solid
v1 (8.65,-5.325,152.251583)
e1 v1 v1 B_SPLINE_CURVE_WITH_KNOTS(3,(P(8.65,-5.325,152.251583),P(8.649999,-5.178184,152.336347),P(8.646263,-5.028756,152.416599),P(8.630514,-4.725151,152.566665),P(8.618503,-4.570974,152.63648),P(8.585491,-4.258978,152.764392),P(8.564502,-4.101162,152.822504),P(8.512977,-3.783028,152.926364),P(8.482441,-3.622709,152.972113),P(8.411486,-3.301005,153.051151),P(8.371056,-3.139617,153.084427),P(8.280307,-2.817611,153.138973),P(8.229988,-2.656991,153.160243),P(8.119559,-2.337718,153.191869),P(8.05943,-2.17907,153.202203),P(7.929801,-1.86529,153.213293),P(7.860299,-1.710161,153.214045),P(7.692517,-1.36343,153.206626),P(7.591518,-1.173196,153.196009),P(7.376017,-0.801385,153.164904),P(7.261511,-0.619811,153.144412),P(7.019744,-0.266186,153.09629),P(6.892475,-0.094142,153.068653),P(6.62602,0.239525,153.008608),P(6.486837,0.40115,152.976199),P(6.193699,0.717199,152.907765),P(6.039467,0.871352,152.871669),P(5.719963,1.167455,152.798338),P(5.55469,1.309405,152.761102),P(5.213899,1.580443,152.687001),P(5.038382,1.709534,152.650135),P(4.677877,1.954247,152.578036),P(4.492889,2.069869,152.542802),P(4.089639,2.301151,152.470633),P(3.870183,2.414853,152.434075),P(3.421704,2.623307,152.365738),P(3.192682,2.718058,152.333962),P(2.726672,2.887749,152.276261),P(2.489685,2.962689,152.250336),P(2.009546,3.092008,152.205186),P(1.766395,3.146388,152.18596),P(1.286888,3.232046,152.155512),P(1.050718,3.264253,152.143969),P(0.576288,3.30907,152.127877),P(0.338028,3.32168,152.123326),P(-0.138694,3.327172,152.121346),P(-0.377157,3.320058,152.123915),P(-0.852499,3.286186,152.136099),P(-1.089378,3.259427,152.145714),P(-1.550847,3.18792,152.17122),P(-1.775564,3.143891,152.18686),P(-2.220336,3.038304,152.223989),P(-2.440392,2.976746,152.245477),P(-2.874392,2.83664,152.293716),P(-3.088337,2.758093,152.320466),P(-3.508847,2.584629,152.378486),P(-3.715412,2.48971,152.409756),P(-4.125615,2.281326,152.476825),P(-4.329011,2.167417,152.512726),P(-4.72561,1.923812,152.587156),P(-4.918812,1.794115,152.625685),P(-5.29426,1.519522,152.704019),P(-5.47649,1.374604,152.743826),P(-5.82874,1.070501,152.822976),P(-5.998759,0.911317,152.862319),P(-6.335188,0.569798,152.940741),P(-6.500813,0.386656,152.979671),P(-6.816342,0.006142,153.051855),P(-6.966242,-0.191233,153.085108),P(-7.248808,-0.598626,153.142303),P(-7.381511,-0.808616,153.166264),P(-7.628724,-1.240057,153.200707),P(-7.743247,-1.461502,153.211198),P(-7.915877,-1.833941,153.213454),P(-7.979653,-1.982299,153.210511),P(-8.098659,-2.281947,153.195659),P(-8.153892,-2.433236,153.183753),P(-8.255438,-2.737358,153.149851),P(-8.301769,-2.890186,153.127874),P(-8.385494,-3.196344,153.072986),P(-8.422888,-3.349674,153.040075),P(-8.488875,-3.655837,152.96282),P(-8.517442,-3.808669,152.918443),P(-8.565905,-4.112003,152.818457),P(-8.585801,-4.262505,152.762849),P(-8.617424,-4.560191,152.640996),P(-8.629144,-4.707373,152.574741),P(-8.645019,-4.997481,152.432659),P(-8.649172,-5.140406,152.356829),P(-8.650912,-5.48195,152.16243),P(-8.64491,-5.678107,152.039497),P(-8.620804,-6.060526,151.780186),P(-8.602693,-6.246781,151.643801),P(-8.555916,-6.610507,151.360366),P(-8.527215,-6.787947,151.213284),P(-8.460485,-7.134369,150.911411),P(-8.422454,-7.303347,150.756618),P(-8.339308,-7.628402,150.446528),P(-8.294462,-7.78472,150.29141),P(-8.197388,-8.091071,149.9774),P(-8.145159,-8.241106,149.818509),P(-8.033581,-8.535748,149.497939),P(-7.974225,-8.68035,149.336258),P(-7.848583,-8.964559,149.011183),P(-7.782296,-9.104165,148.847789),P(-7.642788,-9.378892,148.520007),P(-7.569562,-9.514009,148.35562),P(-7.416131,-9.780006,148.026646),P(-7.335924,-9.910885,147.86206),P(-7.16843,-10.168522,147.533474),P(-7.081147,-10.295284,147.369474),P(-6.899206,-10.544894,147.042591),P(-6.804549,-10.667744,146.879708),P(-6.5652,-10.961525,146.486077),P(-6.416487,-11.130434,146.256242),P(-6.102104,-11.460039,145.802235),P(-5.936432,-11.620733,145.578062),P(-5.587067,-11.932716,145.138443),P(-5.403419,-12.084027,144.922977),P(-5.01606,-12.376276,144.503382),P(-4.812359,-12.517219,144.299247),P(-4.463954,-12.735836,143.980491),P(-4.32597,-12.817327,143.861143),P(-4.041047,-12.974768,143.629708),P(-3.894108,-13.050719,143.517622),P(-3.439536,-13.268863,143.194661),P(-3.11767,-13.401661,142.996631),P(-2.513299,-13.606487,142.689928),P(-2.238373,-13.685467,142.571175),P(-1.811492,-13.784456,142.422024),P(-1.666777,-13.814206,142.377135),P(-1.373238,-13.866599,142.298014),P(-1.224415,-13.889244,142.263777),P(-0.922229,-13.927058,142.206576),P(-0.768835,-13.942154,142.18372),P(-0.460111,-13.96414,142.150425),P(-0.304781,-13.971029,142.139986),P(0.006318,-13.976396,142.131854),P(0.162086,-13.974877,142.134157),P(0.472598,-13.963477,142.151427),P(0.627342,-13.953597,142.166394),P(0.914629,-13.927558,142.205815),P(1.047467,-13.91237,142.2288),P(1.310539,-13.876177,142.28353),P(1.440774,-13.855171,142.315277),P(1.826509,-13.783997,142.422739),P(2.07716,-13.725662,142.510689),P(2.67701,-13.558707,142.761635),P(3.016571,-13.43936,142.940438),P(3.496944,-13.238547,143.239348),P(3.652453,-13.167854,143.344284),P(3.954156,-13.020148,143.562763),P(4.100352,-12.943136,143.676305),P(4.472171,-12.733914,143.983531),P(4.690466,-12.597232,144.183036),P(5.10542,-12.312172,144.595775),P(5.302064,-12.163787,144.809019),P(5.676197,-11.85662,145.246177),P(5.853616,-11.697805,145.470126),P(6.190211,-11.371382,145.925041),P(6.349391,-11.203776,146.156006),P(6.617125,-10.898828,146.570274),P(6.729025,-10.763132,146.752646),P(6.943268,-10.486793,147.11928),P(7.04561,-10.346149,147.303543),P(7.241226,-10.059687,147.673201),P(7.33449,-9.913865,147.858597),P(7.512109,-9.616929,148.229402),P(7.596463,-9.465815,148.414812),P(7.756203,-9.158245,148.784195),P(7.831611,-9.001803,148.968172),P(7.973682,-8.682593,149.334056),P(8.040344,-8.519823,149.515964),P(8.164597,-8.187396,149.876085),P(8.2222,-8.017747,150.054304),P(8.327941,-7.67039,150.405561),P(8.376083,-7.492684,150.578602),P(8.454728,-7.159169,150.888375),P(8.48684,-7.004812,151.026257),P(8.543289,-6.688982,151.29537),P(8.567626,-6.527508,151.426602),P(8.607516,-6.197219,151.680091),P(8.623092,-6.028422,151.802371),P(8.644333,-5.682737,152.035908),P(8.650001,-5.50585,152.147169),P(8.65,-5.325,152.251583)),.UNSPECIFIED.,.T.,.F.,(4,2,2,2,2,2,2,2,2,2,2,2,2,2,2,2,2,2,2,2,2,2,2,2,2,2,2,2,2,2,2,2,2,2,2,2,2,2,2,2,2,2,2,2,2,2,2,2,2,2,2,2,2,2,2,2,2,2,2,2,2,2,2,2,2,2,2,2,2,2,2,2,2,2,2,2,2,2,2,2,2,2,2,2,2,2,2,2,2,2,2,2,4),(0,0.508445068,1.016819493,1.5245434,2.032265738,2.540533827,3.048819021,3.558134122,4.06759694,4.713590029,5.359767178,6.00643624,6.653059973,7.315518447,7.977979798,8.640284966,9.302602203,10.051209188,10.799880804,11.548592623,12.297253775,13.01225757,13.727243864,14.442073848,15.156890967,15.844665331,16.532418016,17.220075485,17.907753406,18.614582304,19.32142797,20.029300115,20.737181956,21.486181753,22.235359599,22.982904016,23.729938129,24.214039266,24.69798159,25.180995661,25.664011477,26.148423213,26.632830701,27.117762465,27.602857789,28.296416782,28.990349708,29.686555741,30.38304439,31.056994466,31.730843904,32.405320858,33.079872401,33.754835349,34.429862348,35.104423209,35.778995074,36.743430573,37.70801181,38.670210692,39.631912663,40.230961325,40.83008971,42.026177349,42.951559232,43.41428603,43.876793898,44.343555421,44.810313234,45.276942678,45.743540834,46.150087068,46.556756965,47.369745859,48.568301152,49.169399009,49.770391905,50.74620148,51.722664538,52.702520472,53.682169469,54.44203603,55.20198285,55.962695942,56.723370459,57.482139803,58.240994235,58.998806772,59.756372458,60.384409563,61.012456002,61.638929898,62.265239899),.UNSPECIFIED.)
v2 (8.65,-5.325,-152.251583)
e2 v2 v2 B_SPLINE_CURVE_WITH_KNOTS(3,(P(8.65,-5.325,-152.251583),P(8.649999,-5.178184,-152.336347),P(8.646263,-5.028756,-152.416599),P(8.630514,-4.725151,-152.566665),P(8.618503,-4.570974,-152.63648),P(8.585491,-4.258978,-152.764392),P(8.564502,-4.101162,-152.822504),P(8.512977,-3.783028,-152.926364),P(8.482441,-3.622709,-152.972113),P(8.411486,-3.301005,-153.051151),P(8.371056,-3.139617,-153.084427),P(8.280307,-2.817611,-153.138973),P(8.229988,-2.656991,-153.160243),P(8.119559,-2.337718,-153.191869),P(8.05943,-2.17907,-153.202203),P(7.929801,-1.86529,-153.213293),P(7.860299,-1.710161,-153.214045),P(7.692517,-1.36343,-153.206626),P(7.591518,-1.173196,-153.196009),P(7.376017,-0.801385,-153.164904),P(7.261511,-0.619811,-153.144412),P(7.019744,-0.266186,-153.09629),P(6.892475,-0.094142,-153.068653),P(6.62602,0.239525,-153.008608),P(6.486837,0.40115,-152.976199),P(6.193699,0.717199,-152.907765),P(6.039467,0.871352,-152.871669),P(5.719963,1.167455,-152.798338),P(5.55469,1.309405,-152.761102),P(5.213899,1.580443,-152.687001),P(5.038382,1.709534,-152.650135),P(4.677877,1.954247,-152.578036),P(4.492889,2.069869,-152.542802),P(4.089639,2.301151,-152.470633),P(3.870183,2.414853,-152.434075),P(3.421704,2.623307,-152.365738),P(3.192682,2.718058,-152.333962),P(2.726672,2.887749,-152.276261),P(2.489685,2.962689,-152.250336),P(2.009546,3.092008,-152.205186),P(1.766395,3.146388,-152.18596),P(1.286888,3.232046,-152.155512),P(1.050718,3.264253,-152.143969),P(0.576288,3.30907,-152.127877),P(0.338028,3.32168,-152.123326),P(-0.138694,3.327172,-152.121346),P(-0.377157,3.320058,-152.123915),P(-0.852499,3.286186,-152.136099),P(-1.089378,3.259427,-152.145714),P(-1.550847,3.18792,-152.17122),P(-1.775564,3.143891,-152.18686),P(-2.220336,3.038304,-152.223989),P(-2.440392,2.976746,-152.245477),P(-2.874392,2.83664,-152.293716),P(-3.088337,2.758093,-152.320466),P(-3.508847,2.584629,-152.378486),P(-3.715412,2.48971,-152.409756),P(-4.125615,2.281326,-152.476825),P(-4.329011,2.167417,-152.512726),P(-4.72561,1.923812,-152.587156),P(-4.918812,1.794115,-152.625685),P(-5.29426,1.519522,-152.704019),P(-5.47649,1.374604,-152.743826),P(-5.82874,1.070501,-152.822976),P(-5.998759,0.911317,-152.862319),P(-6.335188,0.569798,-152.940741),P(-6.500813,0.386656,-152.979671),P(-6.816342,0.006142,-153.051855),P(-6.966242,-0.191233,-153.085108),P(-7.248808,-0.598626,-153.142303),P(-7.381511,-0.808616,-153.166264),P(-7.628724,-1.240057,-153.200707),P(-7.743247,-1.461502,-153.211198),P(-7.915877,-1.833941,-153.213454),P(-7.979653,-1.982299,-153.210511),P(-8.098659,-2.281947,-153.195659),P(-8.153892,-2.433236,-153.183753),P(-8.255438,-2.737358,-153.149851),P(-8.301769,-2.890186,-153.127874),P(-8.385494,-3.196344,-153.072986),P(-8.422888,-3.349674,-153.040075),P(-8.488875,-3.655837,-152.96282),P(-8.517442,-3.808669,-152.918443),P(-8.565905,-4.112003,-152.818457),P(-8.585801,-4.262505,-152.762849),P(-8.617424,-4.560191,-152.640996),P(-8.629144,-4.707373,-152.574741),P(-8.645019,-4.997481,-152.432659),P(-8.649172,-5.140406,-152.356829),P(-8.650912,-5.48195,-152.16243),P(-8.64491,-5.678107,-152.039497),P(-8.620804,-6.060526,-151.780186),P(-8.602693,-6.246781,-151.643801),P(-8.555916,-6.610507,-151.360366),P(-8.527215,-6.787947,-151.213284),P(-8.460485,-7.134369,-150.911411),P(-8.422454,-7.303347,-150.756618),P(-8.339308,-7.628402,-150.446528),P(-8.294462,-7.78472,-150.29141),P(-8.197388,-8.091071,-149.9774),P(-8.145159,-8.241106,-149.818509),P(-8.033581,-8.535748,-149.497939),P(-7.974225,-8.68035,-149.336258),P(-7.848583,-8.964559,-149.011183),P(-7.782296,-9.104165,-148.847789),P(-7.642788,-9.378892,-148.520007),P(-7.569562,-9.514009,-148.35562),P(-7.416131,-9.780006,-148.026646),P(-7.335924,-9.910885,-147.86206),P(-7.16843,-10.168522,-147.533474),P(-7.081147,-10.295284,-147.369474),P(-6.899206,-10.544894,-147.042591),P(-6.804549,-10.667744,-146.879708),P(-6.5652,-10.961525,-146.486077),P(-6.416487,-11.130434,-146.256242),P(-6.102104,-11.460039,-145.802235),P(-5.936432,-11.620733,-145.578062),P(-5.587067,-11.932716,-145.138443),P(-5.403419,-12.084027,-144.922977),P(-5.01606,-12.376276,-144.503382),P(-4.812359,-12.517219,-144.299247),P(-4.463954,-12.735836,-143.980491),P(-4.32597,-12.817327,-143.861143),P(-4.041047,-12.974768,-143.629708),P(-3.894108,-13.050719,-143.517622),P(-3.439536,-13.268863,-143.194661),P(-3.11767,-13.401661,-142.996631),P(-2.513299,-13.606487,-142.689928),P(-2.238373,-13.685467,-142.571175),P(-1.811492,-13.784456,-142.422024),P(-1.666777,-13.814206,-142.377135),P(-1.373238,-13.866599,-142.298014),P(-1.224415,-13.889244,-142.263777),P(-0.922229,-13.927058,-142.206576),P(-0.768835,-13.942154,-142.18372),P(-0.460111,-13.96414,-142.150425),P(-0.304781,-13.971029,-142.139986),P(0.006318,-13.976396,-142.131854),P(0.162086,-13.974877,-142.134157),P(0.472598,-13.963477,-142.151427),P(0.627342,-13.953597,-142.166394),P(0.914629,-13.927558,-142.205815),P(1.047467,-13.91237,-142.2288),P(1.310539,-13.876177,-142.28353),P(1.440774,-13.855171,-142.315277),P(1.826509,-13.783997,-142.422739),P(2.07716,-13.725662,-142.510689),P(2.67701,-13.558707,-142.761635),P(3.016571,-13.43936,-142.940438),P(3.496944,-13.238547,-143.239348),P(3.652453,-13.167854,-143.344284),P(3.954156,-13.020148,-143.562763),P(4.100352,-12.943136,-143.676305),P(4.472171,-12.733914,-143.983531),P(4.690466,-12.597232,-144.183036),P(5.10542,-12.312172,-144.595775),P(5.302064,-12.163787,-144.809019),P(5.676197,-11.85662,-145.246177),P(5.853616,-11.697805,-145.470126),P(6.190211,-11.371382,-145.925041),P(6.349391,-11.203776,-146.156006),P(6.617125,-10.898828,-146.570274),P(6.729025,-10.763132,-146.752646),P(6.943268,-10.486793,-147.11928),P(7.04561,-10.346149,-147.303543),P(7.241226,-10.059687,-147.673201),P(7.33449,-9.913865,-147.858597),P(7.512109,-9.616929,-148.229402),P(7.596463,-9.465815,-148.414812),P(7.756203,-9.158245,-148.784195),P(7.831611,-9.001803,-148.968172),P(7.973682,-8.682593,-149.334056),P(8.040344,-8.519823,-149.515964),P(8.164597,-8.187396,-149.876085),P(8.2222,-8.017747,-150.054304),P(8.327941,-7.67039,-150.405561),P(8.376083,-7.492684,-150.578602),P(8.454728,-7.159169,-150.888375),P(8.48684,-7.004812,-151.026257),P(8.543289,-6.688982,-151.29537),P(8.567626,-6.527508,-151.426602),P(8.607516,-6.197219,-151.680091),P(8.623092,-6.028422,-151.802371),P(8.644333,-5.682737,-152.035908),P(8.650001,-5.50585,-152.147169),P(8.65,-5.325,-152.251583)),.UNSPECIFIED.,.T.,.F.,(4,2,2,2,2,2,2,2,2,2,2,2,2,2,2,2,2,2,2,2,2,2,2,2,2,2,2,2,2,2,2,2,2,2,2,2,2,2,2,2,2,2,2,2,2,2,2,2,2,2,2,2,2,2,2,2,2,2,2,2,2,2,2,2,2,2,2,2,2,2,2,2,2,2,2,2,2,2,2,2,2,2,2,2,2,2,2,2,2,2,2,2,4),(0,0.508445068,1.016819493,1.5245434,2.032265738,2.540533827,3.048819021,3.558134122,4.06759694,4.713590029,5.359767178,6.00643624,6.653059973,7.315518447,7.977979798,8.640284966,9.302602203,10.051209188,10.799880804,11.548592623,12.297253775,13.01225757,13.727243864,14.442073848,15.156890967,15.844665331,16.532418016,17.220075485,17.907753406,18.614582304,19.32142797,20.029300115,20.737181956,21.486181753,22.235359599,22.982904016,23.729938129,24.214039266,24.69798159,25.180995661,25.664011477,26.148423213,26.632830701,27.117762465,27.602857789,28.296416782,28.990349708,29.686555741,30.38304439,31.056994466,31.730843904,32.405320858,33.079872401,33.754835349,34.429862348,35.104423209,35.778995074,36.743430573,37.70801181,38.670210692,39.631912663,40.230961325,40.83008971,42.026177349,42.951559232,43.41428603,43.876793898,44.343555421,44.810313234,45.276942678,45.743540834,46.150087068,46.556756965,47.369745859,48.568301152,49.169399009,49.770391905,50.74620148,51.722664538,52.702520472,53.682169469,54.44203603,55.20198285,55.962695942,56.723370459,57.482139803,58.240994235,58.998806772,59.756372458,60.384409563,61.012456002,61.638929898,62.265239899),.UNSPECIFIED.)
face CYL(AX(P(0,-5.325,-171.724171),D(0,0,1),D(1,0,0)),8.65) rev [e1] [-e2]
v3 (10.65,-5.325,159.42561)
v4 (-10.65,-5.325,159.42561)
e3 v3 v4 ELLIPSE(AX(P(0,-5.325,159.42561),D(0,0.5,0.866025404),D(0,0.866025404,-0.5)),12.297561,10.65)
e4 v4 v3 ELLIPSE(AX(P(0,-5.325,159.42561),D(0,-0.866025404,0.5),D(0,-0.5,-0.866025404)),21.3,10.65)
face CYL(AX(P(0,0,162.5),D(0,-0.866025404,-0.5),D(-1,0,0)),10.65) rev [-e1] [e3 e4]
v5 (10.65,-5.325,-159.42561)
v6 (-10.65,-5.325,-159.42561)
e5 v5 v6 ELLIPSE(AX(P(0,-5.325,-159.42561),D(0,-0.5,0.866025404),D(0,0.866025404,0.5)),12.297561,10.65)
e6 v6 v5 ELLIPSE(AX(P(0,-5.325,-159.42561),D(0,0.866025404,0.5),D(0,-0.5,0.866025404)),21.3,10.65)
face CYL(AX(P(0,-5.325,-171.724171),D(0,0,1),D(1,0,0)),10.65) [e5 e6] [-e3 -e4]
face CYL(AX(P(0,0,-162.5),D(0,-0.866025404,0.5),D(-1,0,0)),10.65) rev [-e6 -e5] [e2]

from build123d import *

# Parameters (mm, degrees)
EXTRUDE_START           = -140.979268616
EXTRUDE_1_OUTLINE_R     = 10.65
EXTRUDE_1_OUTLINE_R_2   = 8.65
EXTRUDE_1_DEPTH         = 140.979268616
EXTRUDE_START_2         = -159.425609917
EXTRUDE_1_2_OUTLINE_R   = 10.65
EXTRUDE_1_2_OUTLINE_R_2 = 8.65
EXTRUDE_1_2_DEPTH       = 18.446341301
EXTRUDE_START_3         = -13.834755825
EXTRUDE_1_3_DEPTH       = 98.834755825


with BuildPart() as part:
    # Бобышка-Вытянуть1: read off the stored shape, not the designer's step
    # Бобышка-Вытянуть1 outline → Бобышка-Вытянуть1 (new body)
    with BuildSketch(Plane.XY.offset(EXTRUDE_START)):
        with Locations((0, -5.325)):
            Circle(EXTRUDE_1_OUTLINE_R)
        with Locations((0, -5.325)):
            Circle(EXTRUDE_1_OUTLINE_R_2, mode=Mode.SUBTRACT)
    extrude(amount=EXTRUDE_1_DEPTH)

    # Extrude 1 2 outline → Extrude 1 2 (add)
    with BuildSketch(Plane.XY.offset(EXTRUDE_START_2)):
        with Locations((0, -5.325)):
            Circle(EXTRUDE_1_2_OUTLINE_R)
        with Locations((0, -5.325)):
            Circle(EXTRUDE_1_2_OUTLINE_R_2, mode=Mode.SUBTRACT)
    extrude(amount=EXTRUDE_1_2_DEPTH)

    # Extrude 1 3 outline → Extrude 1 3 (cut)
    with BuildSketch(Plane(origin=(0, 0, 0), x_dir=(1, 0, 0), z_dir=(0, 0.8660254037845098, -0.4999999999998769)).offset(EXTRUDE_START_3)):
        with BuildLine():
            ThreePointArc((-10.65, 140.729128115), (0, 130.079128115), (10.65, 140.729128115))
            Line((10.65, 140.729128115), (10.65, 148))
            Line((10.65, 148), (-10.65, 148))
            Line((-10.65, 148), (-10.65, 140.729128115))
        make_face()
    extrude(amount=EXTRUDE_1_3_DEPTH, mode=Mode.SUBTRACT)

    # Зеркальное отражение1: part across plane


with BuildPart() as part_1:
    add(part.part)
    add(part.part.mirror(Plane(origin=(0, -5.325, 0), x_dir=(1, 0, 0), z_dir=(0, 0, 1))))


solid = part_1.part
